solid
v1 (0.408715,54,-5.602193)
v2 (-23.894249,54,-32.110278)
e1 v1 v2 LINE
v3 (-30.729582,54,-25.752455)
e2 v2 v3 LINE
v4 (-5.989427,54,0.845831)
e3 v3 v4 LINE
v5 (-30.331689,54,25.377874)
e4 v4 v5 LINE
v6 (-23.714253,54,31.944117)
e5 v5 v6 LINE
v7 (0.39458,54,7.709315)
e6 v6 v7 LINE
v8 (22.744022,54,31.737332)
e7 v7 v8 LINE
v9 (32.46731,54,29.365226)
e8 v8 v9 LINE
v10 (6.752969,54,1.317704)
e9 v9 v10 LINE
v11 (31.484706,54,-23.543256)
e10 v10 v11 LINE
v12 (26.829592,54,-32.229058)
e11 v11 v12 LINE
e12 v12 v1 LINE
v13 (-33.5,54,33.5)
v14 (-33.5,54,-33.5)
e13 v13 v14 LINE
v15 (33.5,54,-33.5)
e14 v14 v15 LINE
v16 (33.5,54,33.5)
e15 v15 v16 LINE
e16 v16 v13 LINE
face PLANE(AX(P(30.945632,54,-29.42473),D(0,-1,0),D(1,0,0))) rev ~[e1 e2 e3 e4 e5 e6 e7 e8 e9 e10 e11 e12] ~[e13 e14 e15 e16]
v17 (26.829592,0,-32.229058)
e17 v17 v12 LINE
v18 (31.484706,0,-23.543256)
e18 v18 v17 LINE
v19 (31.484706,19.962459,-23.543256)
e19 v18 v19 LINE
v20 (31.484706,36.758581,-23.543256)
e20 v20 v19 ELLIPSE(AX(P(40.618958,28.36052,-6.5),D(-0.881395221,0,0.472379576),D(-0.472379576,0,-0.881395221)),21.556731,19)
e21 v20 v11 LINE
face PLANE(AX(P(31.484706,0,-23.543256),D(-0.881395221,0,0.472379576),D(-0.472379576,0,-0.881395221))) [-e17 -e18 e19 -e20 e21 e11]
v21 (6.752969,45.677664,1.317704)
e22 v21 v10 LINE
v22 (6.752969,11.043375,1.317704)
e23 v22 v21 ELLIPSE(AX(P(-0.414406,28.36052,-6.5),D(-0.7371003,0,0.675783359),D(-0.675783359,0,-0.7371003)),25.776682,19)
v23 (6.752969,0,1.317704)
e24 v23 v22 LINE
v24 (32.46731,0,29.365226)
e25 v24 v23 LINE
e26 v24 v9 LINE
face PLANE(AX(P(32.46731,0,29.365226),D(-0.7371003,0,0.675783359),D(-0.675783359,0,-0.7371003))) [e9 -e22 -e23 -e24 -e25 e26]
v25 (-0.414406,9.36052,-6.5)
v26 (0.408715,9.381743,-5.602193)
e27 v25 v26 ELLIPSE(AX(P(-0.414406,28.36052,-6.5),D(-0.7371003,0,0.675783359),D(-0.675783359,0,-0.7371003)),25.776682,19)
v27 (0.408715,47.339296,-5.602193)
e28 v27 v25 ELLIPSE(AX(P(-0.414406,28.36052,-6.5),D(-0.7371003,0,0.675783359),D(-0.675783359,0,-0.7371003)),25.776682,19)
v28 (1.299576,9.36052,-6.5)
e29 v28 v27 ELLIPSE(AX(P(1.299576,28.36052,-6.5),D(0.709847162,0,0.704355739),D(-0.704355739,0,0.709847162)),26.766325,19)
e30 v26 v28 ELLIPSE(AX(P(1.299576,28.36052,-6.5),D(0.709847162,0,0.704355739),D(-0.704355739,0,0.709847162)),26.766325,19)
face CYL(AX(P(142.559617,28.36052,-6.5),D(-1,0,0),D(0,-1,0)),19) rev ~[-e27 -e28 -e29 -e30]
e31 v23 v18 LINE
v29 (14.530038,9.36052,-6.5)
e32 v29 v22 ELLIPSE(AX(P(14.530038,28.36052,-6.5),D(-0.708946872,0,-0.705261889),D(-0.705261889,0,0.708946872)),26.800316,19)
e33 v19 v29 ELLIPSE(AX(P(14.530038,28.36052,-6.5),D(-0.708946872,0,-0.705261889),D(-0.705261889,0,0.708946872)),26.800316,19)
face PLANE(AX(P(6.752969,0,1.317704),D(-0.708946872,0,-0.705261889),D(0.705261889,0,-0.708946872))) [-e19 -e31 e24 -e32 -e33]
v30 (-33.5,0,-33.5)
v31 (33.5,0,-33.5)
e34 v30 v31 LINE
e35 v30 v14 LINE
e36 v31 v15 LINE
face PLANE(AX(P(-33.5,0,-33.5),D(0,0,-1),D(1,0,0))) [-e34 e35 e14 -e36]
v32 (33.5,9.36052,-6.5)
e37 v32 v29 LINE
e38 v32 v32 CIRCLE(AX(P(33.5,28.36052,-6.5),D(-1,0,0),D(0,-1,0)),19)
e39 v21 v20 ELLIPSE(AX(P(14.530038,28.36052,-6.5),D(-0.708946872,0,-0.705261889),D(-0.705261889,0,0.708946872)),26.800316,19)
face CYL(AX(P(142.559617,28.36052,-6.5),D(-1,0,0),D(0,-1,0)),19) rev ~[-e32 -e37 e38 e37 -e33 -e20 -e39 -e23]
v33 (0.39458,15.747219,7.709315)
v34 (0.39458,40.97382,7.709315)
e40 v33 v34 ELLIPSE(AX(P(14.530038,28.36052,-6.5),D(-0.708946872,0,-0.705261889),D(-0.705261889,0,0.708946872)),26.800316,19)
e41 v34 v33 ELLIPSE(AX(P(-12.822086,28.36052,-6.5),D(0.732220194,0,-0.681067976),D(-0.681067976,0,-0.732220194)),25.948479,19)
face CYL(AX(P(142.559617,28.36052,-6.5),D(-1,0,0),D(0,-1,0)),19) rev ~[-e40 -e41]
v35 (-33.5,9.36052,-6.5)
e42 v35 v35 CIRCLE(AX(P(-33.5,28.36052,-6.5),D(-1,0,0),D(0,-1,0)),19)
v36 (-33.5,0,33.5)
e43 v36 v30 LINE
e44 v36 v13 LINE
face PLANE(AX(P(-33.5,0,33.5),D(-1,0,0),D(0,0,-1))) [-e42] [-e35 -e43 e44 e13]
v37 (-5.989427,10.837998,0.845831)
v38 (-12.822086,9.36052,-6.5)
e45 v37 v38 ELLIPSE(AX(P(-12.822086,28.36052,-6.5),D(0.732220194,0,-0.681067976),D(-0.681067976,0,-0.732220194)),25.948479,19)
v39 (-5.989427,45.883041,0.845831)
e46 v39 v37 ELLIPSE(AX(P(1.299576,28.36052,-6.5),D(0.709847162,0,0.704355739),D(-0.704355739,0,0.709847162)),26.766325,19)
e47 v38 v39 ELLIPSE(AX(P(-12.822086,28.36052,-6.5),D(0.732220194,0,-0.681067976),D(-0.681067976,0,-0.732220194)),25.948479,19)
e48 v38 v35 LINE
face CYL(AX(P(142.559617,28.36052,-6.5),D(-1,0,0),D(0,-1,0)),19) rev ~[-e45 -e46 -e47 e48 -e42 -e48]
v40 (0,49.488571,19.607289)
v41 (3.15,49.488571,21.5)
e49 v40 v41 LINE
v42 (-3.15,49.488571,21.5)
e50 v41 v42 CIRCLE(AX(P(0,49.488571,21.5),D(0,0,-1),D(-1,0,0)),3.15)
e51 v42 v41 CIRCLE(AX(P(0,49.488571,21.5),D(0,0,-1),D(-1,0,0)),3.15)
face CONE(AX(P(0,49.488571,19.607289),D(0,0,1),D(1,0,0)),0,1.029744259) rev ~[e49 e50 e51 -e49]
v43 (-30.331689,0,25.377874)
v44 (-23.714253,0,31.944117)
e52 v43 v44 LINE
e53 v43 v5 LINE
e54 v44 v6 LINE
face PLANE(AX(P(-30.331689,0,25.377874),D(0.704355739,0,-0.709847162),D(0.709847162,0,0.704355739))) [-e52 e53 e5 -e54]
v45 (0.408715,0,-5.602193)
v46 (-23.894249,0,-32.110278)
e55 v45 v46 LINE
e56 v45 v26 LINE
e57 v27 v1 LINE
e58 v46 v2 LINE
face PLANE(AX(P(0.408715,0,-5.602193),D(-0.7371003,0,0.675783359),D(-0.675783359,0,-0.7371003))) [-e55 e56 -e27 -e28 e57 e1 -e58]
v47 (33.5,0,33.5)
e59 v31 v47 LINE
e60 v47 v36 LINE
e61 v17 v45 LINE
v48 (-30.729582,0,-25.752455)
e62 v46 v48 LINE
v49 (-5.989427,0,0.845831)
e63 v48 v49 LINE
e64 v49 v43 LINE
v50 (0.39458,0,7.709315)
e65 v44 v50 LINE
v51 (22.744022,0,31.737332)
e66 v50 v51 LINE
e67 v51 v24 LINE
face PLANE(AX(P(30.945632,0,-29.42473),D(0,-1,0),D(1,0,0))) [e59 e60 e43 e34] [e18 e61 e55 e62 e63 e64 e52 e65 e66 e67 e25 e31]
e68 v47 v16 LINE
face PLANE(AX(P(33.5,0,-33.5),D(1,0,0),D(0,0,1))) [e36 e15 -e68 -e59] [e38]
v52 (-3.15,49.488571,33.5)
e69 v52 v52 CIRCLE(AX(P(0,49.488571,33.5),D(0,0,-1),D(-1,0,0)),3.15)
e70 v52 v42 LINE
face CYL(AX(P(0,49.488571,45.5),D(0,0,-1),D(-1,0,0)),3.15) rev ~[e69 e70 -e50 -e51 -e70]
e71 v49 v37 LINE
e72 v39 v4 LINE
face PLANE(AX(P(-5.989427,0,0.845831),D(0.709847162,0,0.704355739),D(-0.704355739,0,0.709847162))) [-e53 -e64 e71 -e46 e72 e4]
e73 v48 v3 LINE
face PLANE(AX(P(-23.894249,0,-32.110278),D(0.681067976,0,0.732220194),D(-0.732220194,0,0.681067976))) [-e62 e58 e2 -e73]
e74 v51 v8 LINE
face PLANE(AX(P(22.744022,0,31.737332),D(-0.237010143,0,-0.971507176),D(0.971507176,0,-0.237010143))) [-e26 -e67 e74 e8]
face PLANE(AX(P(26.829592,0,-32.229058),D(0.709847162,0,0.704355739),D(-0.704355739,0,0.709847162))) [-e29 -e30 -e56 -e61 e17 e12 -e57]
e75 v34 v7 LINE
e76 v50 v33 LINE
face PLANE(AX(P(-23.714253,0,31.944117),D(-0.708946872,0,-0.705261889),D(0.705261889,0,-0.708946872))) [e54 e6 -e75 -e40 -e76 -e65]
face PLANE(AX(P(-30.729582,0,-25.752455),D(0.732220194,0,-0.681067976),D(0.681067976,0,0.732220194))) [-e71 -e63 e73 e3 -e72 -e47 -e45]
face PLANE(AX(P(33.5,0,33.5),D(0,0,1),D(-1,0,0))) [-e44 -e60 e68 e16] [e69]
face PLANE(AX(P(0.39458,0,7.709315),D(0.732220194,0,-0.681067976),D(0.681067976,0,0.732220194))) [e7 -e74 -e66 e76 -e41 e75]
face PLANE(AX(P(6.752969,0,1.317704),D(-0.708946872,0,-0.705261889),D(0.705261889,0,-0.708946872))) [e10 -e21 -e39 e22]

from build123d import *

# Parameters (mm, degrees)
F1_DEPTH = 54
F3_D     = 38
F5_D     = 6.3
F5_DEPTH = 12
F5_TIP   = 1.8927109499


# Not quite as in the source:
# - a feature names something its author has since deleted; it is built from what else it names


with BuildPart() as f1:
    # F0 (on Front) → F1 (new body)
    with BuildSketch(Plane.XZ):
        Polygon((28.0907023698, -33.5), (33.5, -33.5), (33.5, -25.5690795523), (31.4847062311, -23.5432559017), (26.8295921046, -32.2290576438), align=None)
        Polygon((-25.1683651974, -33.5), (28.0907023698, -33.5), (26.8295921046, -32.2290576438), (0.4087149623, -5.6021933843), (-23.8942493722, -32.1102777692), align=None)
        Polygon((31.4847062311, -23.5432559017), (33.5, -25.5690795523), (33.5, 30.4916165769), (32.4673100421, 29.3652258959), (6.7529691073, 1.3177042019), align=None)
        Polygon((-33.5, -33.5), (-25.1683651974, -33.5), (-23.8942493722, -32.1102777692), (-30.7295821389, -25.7524549578), (-33.5, -28.7309475243), align=None)
        Polygon((32.4673100421, 29.3652258959), (33.5, 30.4916165769), (33.5, 33.5), (24.3835517234, 33.5), (22.7440218852, 31.7373318104), align=None)
        Polygon((-33.5, 28.5708867013), (-33.5, -28.7309475243), (-30.7295821389, -25.7524549578), (-5.9894273378, 0.8458312449), (-30.3316890574, 25.3778744124), align=None)
        Polygon((22.7440218852, 31.7373318104), (24.3835517234, 33.5), (-25.2620486716, 33.5), (-23.714253223, 31.9441173419), (0.3945803139, 7.7093154877), align=None)
        Polygon((-33.5, 33.5), (-33.5, 28.5708867013), (-30.3316890574, 25.3778744124), (-23.714253223, 31.9441173419), (-25.2620486716, 33.5), align=None)
    extrude(amount=-F1_DEPTH)

    # F3 (through all)
    with Locations(Plane.YZ.offset(33.5)):
        with Locations((28.3605195582, -6.5)):
            Hole(F3_D / 2)

    # F5
    with Locations(Plane.XY.offset(33.5)):
        with Locations((0, 49.4885705411)):
            Hole(F5_D / 2, depth=F5_DEPTH)
            with Locations((0, 0, -(F5_DEPTH + F5_TIP / 2))):  # 118° drill point
                Cone(0, F5_D / 2, F5_TIP, mode=Mode.SUBTRACT)


solid = f1.part
